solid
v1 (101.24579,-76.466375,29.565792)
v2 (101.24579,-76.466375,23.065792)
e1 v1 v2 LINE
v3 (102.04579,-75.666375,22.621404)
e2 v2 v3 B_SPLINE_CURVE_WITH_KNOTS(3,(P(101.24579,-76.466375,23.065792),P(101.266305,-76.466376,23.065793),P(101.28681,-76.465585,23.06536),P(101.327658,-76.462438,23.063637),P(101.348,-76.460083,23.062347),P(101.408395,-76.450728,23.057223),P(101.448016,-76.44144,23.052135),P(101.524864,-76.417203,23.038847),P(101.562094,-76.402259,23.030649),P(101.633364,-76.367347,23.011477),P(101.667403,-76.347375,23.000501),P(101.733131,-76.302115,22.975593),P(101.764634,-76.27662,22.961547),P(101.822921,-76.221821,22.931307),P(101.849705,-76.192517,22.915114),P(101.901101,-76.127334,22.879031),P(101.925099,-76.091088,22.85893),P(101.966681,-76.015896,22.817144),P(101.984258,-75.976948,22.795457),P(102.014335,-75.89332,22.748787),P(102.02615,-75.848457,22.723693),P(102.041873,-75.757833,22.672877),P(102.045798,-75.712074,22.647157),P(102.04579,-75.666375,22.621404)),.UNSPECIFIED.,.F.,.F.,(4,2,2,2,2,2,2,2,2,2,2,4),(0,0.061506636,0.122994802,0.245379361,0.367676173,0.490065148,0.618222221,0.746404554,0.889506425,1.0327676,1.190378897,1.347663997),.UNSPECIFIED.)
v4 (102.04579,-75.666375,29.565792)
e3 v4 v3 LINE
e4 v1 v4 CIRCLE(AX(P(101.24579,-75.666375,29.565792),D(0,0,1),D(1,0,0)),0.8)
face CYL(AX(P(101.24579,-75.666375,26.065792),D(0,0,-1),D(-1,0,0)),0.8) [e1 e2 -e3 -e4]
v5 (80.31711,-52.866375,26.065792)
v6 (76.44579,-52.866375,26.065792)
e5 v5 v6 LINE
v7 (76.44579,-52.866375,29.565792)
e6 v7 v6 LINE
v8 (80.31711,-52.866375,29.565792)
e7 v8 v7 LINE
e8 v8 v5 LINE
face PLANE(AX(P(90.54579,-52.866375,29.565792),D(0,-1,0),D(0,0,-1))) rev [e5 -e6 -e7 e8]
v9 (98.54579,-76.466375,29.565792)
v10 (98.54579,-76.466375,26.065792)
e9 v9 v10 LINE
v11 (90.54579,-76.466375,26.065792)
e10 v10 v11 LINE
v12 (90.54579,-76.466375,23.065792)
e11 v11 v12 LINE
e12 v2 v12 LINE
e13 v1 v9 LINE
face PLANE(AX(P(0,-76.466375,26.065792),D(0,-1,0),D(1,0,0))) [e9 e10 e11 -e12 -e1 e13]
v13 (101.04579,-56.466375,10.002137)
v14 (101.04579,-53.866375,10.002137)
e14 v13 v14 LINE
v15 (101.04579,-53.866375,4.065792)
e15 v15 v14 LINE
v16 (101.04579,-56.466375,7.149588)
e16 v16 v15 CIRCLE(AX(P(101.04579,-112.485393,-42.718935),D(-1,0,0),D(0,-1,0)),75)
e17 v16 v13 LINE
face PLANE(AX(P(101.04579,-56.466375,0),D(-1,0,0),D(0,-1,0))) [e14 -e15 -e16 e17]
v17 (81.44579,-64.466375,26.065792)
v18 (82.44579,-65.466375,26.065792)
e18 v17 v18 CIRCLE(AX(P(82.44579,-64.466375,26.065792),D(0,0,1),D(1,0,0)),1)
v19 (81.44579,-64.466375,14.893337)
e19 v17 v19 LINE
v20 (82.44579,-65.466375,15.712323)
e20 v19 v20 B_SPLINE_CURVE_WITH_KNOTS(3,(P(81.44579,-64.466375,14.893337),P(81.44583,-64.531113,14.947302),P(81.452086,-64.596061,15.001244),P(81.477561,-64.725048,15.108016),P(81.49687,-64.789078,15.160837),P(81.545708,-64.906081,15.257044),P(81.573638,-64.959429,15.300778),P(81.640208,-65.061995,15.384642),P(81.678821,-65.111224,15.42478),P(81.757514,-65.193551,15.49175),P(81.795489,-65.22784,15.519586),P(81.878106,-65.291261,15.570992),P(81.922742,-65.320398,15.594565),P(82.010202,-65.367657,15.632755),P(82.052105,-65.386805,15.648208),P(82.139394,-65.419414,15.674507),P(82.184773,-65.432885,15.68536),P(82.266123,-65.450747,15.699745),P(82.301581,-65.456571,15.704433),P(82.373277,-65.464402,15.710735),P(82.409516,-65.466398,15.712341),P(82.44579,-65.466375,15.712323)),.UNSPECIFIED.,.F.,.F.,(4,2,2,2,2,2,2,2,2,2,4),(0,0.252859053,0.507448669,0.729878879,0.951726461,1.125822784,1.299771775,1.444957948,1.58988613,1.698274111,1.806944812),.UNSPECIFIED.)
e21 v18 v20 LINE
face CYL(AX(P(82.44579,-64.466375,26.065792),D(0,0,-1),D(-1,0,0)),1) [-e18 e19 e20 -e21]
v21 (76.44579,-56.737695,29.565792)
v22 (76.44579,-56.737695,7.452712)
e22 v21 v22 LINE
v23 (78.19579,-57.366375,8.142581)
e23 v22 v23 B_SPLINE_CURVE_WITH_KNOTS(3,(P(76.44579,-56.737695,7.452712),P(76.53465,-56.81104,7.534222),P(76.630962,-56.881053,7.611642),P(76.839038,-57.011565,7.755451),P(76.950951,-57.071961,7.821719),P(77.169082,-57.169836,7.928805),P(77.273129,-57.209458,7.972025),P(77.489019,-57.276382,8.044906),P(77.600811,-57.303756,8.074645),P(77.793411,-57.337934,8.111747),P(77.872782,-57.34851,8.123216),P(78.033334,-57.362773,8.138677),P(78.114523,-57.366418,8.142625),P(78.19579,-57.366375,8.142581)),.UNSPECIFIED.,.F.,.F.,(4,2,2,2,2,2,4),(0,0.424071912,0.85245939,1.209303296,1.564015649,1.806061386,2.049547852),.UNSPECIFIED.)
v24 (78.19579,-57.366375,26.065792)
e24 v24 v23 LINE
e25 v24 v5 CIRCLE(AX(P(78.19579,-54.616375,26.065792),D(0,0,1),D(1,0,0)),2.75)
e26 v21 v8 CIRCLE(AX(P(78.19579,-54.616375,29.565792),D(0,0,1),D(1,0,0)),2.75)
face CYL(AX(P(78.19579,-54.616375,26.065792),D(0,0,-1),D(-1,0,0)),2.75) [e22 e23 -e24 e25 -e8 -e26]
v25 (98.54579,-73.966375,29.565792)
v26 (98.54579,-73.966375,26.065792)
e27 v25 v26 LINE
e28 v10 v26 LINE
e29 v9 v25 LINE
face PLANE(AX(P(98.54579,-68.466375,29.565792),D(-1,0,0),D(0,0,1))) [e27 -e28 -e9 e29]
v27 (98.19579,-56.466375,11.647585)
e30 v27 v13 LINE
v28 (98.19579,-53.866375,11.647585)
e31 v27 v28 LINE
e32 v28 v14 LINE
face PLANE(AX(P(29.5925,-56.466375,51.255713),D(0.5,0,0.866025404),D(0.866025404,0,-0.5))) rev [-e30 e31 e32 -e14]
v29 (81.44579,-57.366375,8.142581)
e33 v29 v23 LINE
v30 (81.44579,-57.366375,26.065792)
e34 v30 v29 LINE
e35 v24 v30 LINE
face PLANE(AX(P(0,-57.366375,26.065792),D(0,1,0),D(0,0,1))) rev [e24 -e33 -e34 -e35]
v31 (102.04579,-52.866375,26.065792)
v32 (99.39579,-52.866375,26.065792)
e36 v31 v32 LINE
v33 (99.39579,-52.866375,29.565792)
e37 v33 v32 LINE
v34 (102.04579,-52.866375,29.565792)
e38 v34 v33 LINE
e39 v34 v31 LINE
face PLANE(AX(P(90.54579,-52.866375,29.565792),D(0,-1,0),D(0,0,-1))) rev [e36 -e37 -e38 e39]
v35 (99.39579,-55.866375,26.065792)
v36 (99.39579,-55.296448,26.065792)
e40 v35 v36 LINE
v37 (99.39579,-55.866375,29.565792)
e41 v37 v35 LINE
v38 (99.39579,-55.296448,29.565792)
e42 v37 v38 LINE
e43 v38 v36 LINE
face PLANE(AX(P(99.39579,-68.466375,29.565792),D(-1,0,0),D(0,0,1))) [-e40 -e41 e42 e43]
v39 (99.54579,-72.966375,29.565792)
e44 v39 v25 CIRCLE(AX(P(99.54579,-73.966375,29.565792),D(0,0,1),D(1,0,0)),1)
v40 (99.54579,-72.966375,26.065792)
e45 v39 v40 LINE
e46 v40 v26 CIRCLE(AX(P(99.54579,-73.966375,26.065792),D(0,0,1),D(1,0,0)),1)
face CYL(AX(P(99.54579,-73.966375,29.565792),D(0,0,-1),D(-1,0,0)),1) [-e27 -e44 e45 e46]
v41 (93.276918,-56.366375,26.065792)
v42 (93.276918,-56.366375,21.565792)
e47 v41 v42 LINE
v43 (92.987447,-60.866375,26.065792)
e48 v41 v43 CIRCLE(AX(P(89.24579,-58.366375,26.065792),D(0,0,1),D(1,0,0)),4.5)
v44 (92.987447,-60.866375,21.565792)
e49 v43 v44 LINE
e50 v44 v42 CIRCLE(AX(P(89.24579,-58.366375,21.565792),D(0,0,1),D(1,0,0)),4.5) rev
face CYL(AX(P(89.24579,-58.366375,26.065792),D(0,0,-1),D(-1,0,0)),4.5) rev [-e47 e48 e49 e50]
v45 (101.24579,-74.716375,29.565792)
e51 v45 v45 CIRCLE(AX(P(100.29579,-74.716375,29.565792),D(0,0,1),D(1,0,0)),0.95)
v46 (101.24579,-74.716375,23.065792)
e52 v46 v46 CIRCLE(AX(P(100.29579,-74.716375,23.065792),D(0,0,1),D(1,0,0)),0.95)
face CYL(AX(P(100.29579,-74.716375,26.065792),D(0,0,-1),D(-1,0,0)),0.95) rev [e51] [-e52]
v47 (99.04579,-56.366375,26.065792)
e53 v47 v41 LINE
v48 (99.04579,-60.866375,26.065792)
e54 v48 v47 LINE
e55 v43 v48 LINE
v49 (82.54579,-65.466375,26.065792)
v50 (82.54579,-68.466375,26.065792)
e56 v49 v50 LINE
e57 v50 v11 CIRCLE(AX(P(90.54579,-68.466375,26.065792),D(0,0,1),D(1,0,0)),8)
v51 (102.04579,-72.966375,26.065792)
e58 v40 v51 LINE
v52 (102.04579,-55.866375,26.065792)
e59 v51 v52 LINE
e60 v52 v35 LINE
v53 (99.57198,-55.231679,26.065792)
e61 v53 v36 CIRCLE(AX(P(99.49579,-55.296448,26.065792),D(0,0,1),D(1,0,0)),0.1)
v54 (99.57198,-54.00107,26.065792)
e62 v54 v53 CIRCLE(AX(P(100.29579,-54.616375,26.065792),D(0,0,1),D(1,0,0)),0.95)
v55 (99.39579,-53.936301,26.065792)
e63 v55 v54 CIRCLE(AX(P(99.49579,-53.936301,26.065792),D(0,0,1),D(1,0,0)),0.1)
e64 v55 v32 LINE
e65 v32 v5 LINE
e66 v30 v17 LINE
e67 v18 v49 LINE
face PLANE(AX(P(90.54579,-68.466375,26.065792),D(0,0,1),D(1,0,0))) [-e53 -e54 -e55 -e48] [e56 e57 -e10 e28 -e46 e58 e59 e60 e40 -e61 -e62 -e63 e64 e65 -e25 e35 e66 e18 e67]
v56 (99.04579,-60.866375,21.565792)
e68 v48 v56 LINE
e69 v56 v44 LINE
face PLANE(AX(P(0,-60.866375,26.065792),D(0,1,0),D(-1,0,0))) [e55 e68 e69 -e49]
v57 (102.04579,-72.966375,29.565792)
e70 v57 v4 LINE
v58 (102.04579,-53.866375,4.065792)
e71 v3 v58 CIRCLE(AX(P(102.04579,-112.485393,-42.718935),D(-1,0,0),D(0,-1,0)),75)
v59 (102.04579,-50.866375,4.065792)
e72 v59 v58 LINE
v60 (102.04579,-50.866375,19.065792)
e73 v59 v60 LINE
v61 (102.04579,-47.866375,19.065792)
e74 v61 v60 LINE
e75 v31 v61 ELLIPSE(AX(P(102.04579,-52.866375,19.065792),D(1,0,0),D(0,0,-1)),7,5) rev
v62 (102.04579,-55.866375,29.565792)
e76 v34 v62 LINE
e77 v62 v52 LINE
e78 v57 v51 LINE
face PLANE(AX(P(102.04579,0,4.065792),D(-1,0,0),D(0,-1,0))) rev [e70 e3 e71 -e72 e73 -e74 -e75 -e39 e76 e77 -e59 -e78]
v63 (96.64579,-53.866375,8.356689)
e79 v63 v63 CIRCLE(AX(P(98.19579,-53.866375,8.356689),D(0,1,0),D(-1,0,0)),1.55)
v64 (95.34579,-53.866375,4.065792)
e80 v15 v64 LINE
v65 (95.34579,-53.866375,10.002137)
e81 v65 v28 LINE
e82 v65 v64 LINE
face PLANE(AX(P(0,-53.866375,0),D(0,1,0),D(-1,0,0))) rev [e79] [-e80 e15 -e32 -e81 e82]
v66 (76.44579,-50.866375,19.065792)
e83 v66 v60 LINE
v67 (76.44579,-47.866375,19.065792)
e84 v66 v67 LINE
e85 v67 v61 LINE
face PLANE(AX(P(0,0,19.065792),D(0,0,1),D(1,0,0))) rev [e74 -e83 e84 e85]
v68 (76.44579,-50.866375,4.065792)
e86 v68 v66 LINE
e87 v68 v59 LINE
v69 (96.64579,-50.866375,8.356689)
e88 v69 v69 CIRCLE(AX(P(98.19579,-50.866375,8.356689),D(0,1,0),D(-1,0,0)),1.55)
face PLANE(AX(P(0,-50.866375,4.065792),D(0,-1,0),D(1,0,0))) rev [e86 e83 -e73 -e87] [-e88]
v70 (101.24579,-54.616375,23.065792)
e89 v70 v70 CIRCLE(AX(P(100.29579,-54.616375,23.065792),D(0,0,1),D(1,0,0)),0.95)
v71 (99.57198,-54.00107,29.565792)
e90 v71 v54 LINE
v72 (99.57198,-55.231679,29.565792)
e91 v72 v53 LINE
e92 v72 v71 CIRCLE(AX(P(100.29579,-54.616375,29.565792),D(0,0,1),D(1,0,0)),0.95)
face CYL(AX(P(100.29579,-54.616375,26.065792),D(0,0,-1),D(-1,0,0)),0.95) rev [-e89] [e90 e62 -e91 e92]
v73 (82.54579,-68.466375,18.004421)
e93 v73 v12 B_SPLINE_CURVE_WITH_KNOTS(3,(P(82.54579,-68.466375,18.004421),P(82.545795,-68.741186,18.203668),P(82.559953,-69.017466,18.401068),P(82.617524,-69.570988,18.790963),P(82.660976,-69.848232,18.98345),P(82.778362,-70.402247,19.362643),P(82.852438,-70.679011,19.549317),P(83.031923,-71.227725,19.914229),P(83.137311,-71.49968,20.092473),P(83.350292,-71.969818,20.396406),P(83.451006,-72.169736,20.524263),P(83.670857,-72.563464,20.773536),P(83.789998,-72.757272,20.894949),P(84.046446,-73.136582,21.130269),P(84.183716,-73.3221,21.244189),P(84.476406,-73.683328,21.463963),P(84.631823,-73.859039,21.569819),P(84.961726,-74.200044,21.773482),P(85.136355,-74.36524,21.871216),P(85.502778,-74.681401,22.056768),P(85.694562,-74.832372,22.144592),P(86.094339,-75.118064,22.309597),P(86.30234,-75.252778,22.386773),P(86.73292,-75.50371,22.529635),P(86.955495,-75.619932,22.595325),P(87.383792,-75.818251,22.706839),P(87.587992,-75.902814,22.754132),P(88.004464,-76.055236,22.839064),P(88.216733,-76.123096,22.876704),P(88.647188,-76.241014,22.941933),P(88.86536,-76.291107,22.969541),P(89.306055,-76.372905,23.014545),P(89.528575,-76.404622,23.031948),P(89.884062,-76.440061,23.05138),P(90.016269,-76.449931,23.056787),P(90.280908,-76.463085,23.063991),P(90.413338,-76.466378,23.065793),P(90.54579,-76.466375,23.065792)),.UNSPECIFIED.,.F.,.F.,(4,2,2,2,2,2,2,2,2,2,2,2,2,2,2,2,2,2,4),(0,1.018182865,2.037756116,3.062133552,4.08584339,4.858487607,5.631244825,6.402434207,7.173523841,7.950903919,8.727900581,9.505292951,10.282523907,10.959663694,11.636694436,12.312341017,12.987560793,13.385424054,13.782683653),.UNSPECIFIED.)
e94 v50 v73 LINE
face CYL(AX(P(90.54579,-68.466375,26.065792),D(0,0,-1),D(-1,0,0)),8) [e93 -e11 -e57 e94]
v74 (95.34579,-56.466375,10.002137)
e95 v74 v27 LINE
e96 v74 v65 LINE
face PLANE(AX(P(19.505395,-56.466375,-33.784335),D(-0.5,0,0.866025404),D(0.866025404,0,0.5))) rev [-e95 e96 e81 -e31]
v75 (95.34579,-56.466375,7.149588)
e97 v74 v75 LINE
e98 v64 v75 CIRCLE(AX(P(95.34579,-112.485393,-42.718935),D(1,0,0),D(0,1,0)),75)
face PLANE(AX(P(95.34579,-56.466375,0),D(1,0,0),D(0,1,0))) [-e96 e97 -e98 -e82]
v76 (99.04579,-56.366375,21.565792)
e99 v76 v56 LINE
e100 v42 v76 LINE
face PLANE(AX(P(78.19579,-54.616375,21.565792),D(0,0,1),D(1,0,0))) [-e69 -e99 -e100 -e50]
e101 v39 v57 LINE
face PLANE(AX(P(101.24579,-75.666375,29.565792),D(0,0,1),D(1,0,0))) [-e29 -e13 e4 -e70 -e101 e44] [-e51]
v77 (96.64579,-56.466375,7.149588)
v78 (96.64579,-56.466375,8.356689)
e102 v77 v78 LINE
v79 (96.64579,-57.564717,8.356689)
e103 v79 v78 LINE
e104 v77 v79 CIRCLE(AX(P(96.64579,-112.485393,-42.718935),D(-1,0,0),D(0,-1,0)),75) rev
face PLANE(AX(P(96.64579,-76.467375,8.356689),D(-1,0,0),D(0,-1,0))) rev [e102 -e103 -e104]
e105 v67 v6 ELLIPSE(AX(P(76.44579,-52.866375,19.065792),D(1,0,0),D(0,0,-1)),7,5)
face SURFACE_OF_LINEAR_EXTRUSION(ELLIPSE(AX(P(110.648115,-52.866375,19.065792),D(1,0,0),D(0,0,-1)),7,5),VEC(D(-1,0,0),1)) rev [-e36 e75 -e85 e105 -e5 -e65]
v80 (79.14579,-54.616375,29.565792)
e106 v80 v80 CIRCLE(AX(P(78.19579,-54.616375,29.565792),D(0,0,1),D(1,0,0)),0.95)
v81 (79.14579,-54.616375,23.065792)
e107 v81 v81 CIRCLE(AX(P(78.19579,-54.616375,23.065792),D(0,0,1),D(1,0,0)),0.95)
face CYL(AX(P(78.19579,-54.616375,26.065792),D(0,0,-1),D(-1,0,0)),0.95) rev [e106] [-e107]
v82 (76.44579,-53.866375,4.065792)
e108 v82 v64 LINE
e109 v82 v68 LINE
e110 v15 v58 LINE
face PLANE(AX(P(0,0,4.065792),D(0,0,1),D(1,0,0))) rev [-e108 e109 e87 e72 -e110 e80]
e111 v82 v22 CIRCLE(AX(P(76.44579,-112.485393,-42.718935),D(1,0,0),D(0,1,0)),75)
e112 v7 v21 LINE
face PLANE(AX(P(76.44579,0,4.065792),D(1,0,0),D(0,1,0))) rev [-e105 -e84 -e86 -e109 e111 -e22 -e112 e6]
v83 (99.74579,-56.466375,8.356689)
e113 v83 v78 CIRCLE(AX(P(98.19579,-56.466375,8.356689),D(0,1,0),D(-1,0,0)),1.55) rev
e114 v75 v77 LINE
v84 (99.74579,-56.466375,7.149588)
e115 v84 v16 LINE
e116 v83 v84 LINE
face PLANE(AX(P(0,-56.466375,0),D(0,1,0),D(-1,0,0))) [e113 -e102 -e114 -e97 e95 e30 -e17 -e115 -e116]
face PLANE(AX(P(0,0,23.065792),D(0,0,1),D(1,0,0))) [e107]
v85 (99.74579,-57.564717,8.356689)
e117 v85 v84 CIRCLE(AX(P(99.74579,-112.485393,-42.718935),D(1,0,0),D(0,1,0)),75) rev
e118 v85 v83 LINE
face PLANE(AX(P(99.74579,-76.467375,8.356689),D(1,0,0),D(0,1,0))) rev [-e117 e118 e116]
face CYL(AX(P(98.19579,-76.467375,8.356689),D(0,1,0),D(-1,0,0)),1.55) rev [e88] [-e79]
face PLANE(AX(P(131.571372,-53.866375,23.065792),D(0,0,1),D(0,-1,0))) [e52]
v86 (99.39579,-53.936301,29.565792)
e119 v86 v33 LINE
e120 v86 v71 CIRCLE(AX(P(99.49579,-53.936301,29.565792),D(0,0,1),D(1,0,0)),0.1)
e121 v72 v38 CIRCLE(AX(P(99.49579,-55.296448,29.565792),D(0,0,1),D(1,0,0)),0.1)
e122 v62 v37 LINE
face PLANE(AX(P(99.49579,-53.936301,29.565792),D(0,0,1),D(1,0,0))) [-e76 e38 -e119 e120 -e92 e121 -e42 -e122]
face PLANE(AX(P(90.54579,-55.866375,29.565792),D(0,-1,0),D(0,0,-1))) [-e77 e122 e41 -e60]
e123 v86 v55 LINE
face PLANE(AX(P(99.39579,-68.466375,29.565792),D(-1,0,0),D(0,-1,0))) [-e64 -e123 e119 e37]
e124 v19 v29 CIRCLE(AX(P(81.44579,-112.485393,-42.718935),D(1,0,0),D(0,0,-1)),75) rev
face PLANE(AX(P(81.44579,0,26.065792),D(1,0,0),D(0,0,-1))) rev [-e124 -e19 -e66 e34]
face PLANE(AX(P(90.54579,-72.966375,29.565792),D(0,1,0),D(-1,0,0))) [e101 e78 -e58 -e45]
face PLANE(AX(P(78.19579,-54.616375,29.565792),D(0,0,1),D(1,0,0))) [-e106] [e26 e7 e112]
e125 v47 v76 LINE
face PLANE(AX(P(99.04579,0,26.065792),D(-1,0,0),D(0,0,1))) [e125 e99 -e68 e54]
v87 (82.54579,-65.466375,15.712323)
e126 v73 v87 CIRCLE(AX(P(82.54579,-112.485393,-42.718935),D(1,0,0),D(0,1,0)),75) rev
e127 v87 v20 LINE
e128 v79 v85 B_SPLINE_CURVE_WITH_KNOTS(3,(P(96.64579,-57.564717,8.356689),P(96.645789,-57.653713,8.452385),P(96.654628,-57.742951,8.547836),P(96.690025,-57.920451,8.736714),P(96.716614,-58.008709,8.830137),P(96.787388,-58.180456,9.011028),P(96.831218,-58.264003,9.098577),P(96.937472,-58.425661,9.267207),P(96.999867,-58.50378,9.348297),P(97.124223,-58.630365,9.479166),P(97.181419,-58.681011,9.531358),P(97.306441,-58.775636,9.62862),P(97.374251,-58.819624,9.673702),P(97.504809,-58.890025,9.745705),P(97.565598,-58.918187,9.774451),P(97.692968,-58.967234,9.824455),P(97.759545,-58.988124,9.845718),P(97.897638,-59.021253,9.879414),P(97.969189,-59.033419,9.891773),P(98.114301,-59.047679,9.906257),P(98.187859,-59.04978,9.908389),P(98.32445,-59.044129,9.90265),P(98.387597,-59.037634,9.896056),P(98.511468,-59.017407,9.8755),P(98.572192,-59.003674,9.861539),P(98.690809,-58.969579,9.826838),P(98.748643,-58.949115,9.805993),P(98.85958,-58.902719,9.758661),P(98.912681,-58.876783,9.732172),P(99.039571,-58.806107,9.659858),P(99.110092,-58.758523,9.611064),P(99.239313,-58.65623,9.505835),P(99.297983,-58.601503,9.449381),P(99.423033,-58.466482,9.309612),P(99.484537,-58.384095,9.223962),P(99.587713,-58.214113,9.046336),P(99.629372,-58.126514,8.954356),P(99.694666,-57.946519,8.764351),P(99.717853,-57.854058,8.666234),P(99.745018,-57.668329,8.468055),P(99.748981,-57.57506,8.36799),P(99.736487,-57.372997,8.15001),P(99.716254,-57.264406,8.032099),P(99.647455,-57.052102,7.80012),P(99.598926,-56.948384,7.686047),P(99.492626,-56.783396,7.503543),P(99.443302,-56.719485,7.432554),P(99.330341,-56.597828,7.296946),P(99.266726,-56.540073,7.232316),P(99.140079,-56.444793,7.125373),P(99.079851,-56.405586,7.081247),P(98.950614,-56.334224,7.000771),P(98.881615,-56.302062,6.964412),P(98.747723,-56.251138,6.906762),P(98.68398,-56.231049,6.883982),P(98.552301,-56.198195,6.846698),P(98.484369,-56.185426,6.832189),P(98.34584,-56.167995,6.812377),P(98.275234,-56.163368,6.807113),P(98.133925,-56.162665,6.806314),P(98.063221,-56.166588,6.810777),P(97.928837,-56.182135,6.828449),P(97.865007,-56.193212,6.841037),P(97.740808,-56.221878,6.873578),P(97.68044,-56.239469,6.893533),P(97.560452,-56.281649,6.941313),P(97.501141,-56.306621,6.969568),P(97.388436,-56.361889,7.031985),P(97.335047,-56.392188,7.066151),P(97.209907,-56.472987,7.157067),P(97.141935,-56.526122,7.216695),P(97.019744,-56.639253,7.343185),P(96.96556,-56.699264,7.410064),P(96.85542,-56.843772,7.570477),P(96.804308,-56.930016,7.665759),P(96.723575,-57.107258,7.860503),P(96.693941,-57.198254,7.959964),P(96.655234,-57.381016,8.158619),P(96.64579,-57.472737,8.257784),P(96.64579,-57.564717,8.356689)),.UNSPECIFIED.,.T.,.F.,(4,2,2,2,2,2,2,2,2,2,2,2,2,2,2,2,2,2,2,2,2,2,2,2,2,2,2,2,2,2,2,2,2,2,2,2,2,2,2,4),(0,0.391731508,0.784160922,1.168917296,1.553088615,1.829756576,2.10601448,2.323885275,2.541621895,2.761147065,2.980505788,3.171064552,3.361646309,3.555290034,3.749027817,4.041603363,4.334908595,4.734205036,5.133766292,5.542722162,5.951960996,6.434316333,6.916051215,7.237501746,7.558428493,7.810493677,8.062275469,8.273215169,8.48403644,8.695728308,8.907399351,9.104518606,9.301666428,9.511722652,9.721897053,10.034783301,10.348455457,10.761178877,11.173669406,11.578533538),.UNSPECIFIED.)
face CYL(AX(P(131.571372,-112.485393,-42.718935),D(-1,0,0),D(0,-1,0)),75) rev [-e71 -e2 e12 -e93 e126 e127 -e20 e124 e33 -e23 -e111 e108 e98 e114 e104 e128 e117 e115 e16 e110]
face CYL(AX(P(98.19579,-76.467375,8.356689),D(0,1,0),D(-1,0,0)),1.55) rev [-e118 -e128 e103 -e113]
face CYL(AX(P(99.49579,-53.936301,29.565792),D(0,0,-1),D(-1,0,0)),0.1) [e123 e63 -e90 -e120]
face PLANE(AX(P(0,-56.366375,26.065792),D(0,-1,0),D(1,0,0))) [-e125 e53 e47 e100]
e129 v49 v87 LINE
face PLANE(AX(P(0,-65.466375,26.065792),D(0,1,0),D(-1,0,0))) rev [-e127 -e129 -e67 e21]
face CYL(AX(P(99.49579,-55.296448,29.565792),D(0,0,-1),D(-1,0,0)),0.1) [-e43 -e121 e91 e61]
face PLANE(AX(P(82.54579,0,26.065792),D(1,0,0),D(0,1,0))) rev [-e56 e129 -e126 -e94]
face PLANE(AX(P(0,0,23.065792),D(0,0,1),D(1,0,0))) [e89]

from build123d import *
from build123d.topology import SkipClean

# Parameters (mm, degrees)
BOSS_EXTRUDE1_START     = -15
BOSS_EXTRUDE1_OUTLINE_W = 25.6
BOSS_EXTRUDE1_OUTLINE_H = 3
BOSS_EXTRUDE1_DEPTH     = 15
SKETCH2_4_W             = 25.6
SKETCH2_4_H             = 6
BOSS_EXTRUDE2_DEPTH     = 4
BOSS_EXTRUDE6_START     = 4
SKETCH2_6_R             = 0.95
BOSS_EXTRUDE6_DEPTH     = 3
BOSS_EXTRUDE7_START     = 7
SKETCH2_7_R             = 0.95
BOSS_EXTRUDE7_DEPTH     = 3.5
BOSS_EXTRUDE8_START     = -25.6
BOSS_EXTRUDE8_DEPTH     = 25.6
CUT_EXTRUDE1_REACH      = 130.924
CUT_EXTRUDE1_END_RADIUS = 75
CUT_EXTRUDE2_START      = -1.5
CUT_EXTRUDE2_DEPTH      = 1.5
CUT_EXTRUDE3_REACH      = 87.887
CUT_EXTRUDE4_REACH      = 111.283
CUT_EXTRUDE4_END_RADIUS = 75
SKETCH6_R               = 1.55
CUT_EXTRUDE5_START      = -3
SKETCH6_4_R             = 1.55
CUT_EXTRUDE5_DEPTH      = 2.6
CUT_EXTRUDE6_START      = -1.098342
SKETCH7_W               = 3.1
SKETCH7_H               = 1.207100643
CUT_EXTRUDE6_DEPTH      = 1.098342


# Read off the part's stored shape, not the designer's step: Boss-Extrude1
with BuildPart() as part:
    # Boss-Extrude1 outline → Boss-Extrude1 (new body)
    with BuildSketch(Plane.XY.offset(19.065792005).offset(BOSS_EXTRUDE1_START)):
        with Locations((89.245789569, -52.366374711)):
            Rectangle(BOSS_EXTRUDE1_OUTLINE_W, BOSS_EXTRUDE1_OUTLINE_H)
    extrude(amount=BOSS_EXTRUDE1_DEPTH)

    # Sketch2<4> → Boss-Extrude2 (add)
    with BuildSketch(Plane.XY.offset(19.065792005)):
        with Locations((89.245789569, -50.866374711)):
            Rectangle(SKETCH2_4_W, SKETCH2_4_H)
    extrude(amount=BOSS_EXTRUDE2_DEPTH)

    # Sketch2<6> → Boss-Extrude6 (add)
    with BuildSketch(Plane.XY.offset(19.065792005).offset(BOSS_EXTRUDE6_START)):
        with BuildLine():
            ThreePointArc((76.445789569, -56.737695055), (77.266039857, -57.204436819), (78.195789569, -57.366374711))
            Line((78.195789569, -57.366374711), (81.445789569, -57.366374711))
            Line((81.445789569, -57.366374711), (81.445789569, -64.466374711))
            ThreePointArc((81.445789569, -64.466374711), (81.738682788, -65.173481493), (82.445789569, -65.466374711))
            Line((82.445789569, -65.466374711), (82.545789569, -65.466374711))
            Line((82.545789569, -65.466374711), (82.545789569, -68.466374711))
            ThreePointArc((82.545789569, -68.466374711), (84.88893532, -74.123228961), (90.545789569, -76.466374711))
            Line((90.545789569, -76.466374711), (101.245789569, -76.466374711))
            ThreePointArc((101.245789569, -76.466374711), (101.811474994, -76.232060136), (102.045789569, -75.666374711))
            Line((102.045789569, -75.666374711), (102.045789569, -47.866374711))
            Line((102.045789569, -47.866374711), (76.445789569, -47.866374711))
            Line((76.445789569, -47.866374711), (76.445789569, -56.737695055))
        make_face()
        with Locations(Location((100.295789569, -54.616374711, 0), (0, 0, 127.863646362))):
            Circle(SKETCH2_6_R, mode=Mode.SUBTRACT)
        with Locations(Location((78.195789569, -54.616374711, 0), (0, 0, 127.863646362))):
            Circle(SKETCH2_6_R, mode=Mode.SUBTRACT)
        with BuildLine():
            Line((99.045789569, -56.366374711), (99.045789569, -60.866374711))
            Line((99.045789569, -60.866374711), (92.987446956, -60.866374711))
            ThreePointArc((92.987446956, -60.866374711), (84.75507119, -58.077500283), (93.276918444, -56.366374711))
            Line((93.276918444, -56.366374711), (99.045789569, -56.366374711))
        make_face(mode=Mode.SUBTRACT)
        with Locations((100.295789569, -74.716374711)):
            Circle(SKETCH2_6_R, mode=Mode.SUBTRACT)
    extrude(amount=BOSS_EXTRUDE6_DEPTH)

    # Sketch2<7> → Boss-Extrude7 (add)
    # profile 1 of 6: a face of its own
    with SkipClean():  # the faces are left unmerged after this step: merging them gives an invalid solid
        with BuildSketch(Plane.XY.offset(19.065792005).offset(BOSS_EXTRUDE7_START)):
            with BuildLine():
                ThreePointArc((78.195789569, -57.366374711), (80.389530666, -56.274687107), (80.84154088, -53.866374711))
                Line((80.84154088, -53.866374711), (78.778884759, -53.866374711))
                ThreePointArc((78.778884759, -53.866374711), (79.049147768, -54.198906407), (79.145789569, -54.616374711))
                ThreePointArc((79.145789569, -54.616374711), (77.778321265, -55.46973291), (77.61269438, -53.866374711))
                Line((77.61269438, -53.866374711), (76.445789569, -53.866374711))
                Line((76.445789569, -53.866374711), (76.445789569, -56.737695055))
                ThreePointArc((76.445789569, -56.737695055), (77.266039857, -57.204436819), (78.195789569, -57.366374711))
            make_face()
        # profile 2 of 6: a face of its own
        with BuildSketch(Plane.XY.offset(19.065792005).offset(BOSS_EXTRUDE7_START)):
            with BuildLine():
                Line((78.778884759, -53.866374711), (80.84154088, -53.866374711))
                ThreePointArc((80.84154088, -53.866374711), (80.631203916, -53.339168009), (80.317109913, -52.866374711))
                Line((80.317109913, -52.866374711), (76.445789569, -52.866374711))
                Line((76.445789569, -52.866374711), (76.445789569, -53.866374711))
                Line((76.445789569, -53.866374711), (77.61269438, -53.866374711))
                ThreePointArc((77.61269438, -53.866374711), (78.195789569, -53.666374711), (78.778884759, -53.866374711))
            make_face()
        # profile 3 of 6: a face of its own
        with BuildSketch(Plane.XY.offset(19.065792005).offset(BOSS_EXTRUDE7_START)):
            with BuildLine():
                Line((102.045789569, -53.866374711), (100.878884759, -53.866374711))
                ThreePointArc((100.878884759, -53.866374711), (101.149147768, -54.198906407), (101.245789569, -54.616374711))
                ThreePointArc((101.245789569, -54.616374711), (100.62357071, -55.508035815), (99.571980046, -55.23167933))
                ThreePointArc((99.571980046, -55.23167933), (99.461286291, -55.202589173), (99.395789569, -55.296448237))
                Line((99.395789569, -55.296448237), (99.395789569, -55.866374711))
                Line((99.395789569, -55.866374711), (102.045789569, -55.866374711))
                Line((102.045789569, -55.866374711), (102.045789569, -53.866374711))
            make_face()
        # profile 4 of 6: a face of its own
        with BuildSketch(Plane.XY.offset(19.065792005).offset(BOSS_EXTRUDE7_START)):
            with BuildLine():
                Line((99.395789569, -52.866374711), (99.395789569, -53.866374711))
                Line((99.395789569, -53.866374711), (99.71269438, -53.866374711))
                ThreePointArc((99.71269438, -53.866374711), (100.295789569, -53.666374711), (100.878884759, -53.866374711))
                Line((100.878884759, -53.866374711), (102.045789569, -53.866374711))
                Line((102.045789569, -53.866374711), (102.045789569, -52.866374711))
                Line((102.045789569, -52.866374711), (99.395789569, -52.866374711))
            make_face()
        # profile 5 of 6: a face of its own
        with BuildSketch(Plane.XY.offset(19.065792005).offset(BOSS_EXTRUDE7_START)):
            with BuildLine():
                Line((99.71269438, -53.866374711), (99.395789569, -53.866374711))
                Line((99.395789569, -53.866374711), (99.395789569, -53.936301186))
                ThreePointArc((99.395789569, -53.936301186), (99.461286291, -54.03016025), (99.571980046, -54.001070093))
                ThreePointArc((99.571980046, -54.001070093), (99.638875805, -53.930106319), (99.71269438, -53.866374711))
            make_face()
        # profile 6 of 6: a face of its own
        with BuildSketch(Plane.XY.offset(19.065792005).offset(BOSS_EXTRUDE7_START)):
            with BuildLine():
                Line((102.045789569, -75.666374711), (102.045789569, -72.966374711))
                Line((102.045789569, -72.966374711), (99.545789569, -72.966374711))
                ThreePointArc((99.545789569, -72.966374711), (98.838682788, -73.25926793), (98.545789569, -73.966374711))
                Line((98.545789569, -73.966374711), (98.545789569, -76.466374711))
                Line((98.545789569, -76.466374711), (101.245789569, -76.466374711))
                ThreePointArc((101.245789569, -76.466374711), (101.811474994, -76.232060136), (102.045789569, -75.666374711))
            make_face()
            with Locations((100.295789569, -74.716374711)):
                Circle(SKETCH2_7_R, mode=Mode.SUBTRACT)
        extrude(amount=BOSS_EXTRUDE7_DEPTH)

    # Sketch3 → Boss-Extrude8 (add)
    with SkipClean():  # the faces are left unmerged after this step: merging them gives an invalid solid
        with BuildSketch(Plane.ZY.offset(-76.445789569).offset(BOSS_EXTRUDE8_START)):
            with BuildLine():
                Line((4.065792005, -53.866374711), (23.065792005, -53.866374711))
                Line((23.065792005, -53.866374711), (23.065792005, -76.466374711))
                ThreePointArc((23.065792005, -76.466374711), (14.688908487, -64.22216174), (4.065792005, -53.866374711))
            make_face()
        extrude(amount=BOSS_EXTRUDE8_DEPTH)

    # Cut-Extrude1: up to this cylinder (the profile starts outside it)
    with SkipClean():  # the faces are left unmerged after this step: merging them gives an invalid solid
        cut_extrude1_end = Plane(origin=(90.860738, -112.485393056, -42.718935079), z_dir=(-1, 0, 0)) * Cylinder(CUT_EXTRUDE1_END_RADIUS, 434.860714, mode=Mode.PRIVATE)
        # Sketch4 → Cut-Extrude1 (cut, up to the surface)
        with BuildSketch(Plane.XY.offset(23.065792005), mode=Mode.PRIVATE) as cut_extrude1_sk1:
            with BuildLine():
                ThreePointArc((76.445789569, -56.737695055), (77.266039857, -57.204436819), (78.195789569, -57.366374711))
                Line((78.195789569, -57.366374711), (81.445789569, -57.366374711))
                Line((81.445789569, -57.366374711), (81.445789569, -64.466374711))
                ThreePointArc((81.445789569, -64.466374711), (81.738682788, -65.173481493), (82.445789569, -65.466374711))
                Line((82.445789569, -65.466374711), (82.545789569, -65.466374711))
                Line((82.545789569, -65.466374711), (82.545789569, -68.466374711))
                ThreePointArc((82.545789569, -68.466374711), (84.88893532, -74.123228961), (90.545789569, -76.466374711))
                Line((90.545789569, -76.466374711), (76.445789569, -76.466374711))
                Line((76.445789569, -76.466374711), (76.445789569, -56.737695055))
            make_face()
        cut_extrude1_tool1 = extrude(cut_extrude1_sk1.sketch, amount=-CUT_EXTRUDE1_REACH, mode=Mode.PRIVATE) - cut_extrude1_end
        add(cut_extrude1_tool1.solids().sort_by_distance((79.854381, -68.162333, 23.065792))[0], mode=Mode.SUBTRACT)
        # Sketch4 → Cut-Extrude1 (cut, up to the surface)
        with BuildSketch(Plane.XY.offset(23.065792005), mode=Mode.PRIVATE) as cut_extrude1_sk2:
            with BuildLine():
                ThreePointArc((101.245789569, -76.466374711), (101.811474994, -76.232060136), (102.045789569, -75.666374711))
                Line((102.045789569, -75.666374711), (102.045789569, -76.466374711))
                Line((102.045789569, -76.466374711), (101.245789569, -76.466374711))
            make_face()
        cut_extrude1_tool2 = extrude(cut_extrude1_sk2.sketch, amount=-CUT_EXTRUDE1_REACH, mode=Mode.PRIVATE) - cut_extrude1_end
        add(cut_extrude1_tool2.solids().sort_by_distance((101.867095, -76.28768, 23.065792))[0], mode=Mode.SUBTRACT)

    # Sketch4<3> → Cut-Extrude2 (cut)
    with SkipClean():  # the faces are left unmerged after this step: merging them gives an invalid solid
        with BuildSketch(Plane.XY.offset(23.065792005).offset(CUT_EXTRUDE2_START)):
            with BuildLine():
                Line((99.045789569, -60.866374711), (99.045789569, -56.366374711))
                Line((99.045789569, -56.366374711), (93.276918444, -56.366374711))
                ThreePointArc((93.276918444, -56.366374711), (84.75507119, -58.077500283), (92.987446956, -60.866374711))
                Line((92.987446956, -60.866374711), (99.045789569, -60.866374711))
            make_face()
        extrude(amount=CUT_EXTRUDE2_DEPTH, mode=Mode.SUBTRACT)

    # Cut-Extrude3: up to this face of the body (flat: up to its plane)
    cut_extrude3_end = Plane(part.part.faces().sort_by_distance((102.045789569, -60.857452704, 17.150237261))[0])
    # Sketch5 → Cut-Extrude3 (cut, up to the picked face)
    with BuildSketch(Plane.ZY.offset(-76.445789569), mode=Mode.PRIVATE) as cut_extrude3_sk1:
        with BuildLine():
            Line((19.065792005, -47.866374711), (26.065792005, -47.866374711))
            Line((26.065792005, -47.866374711), (26.065792005, -52.866374711))
            add(Edge.make_bspline(
                [(26.065792005, -52.866374711), (26.065792005, -47.866374711), (19.065792005, -47.866374711)],
                knots=[3.141592654, 3.141592654, 3.141592654, 4.71238898, 4.71238898, 4.71238898], degree=2, weights=[1, 0.707106781, 1]))
        make_face()
    cut_extrude3_tool1 = split(extrude(cut_extrude3_sk1.sketch, amount=-CUT_EXTRUDE3_REACH, mode=Mode.PRIVATE), bisect_by=cut_extrude3_end, keep=Keep.BOTH, mode=Mode.PRIVATE)
    add(cut_extrude3_tool1.solids().sort_by(Axis((76.44579, -48.983214, 24.502216), (1, 0, 0)))[0], mode=Mode.SUBTRACT)

    # Cut-Extrude4: up to this cylinder (the profile starts outside it)
    with SkipClean():  # the faces are left unmerged after this step: merging them gives an invalid solid
        cut_extrude4_end = Plane(origin=(113.9359425, -112.485393056, -42.718935079), z_dir=(-1, 0, 0)) * Cylinder(CUT_EXTRUDE4_END_RADIUS, 405.046305, mode=Mode.PRIVATE)
        # Sketch6 → Cut-Extrude4 (cut, up to the surface)
        with BuildSketch(Plane(origin=(0, -50.866374711, 0), x_dir=(1, 0, 0), z_dir=(0, 1, 0)), mode=Mode.PRIVATE) as cut_extrude4_sk1:
            with Locations((129.676095042, -14.774895471)):
                Circle(SKETCH6_R)
        cut_extrude4_tool1 = extrude(cut_extrude4_sk1.sketch, amount=-CUT_EXTRUDE4_REACH, mode=Mode.PRIVATE) - cut_extrude4_end
        add(cut_extrude4_tool1.solids().sort_by_distance((129.676095, -50.866375, 14.774895))[0], mode=Mode.SUBTRACT)
        # Sketch6 → Cut-Extrude4 (cut, up to the surface)
        with BuildSketch(Plane(origin=(0, -50.866374711, 0), x_dir=(1, 0, 0), z_dir=(0, 1, 0)), mode=Mode.PRIVATE) as cut_extrude4_sk2:
            with Locations(Location((98.195789569, -8.356688539, 0), (0, 0, 180))):
                Circle(SKETCH6_R)
        cut_extrude4_tool2 = extrude(cut_extrude4_sk2.sketch, amount=-CUT_EXTRUDE4_REACH, mode=Mode.PRIVATE) - cut_extrude4_end
        add(cut_extrude4_tool2.solids().sort_by_distance((98.19579, -50.866375, 8.356689))[0], mode=Mode.SUBTRACT)

    # Sketch6<4> → Cut-Extrude5 (cut)
    # profile 1 of 4: a face of its own
    with SkipClean():  # the faces are left unmerged after this step: merging them gives an invalid solid
        with BuildSketch(Plane(origin=(0, -50.866374711, 0), x_dir=(1, 0, 0), z_dir=(0, 1, 0)).offset(CUT_EXTRUDE5_START)):
            Polygon((132.526095042, -13.129447203), (129.676095042, -11.483998936), (126.826095042, -13.129447203), (126.826095042, -16.420343738), (129.676095042, -18.065792005), (132.526095042, -16.420343738), align=None)
            with Locations((129.676095042, -14.774895471)):
                Circle(SKETCH6_4_R, mode=Mode.SUBTRACT)
        # profile 2 of 4: a face of its own
        with BuildSketch(Plane(origin=(0, -50.866374711, 0), x_dir=(1, 0, 0), z_dir=(0, 1, 0)).offset(CUT_EXTRUDE5_START)):
            Polygon((126.826095042, -13.129447203), (129.676095042, -11.483998936), (132.526095042, -13.129447203), (132.526095042, -4.065792005), (126.826095042, -4.065792005), align=None)
        # profile 3 of 4: a face of its own
        with BuildSketch(Plane(origin=(0, -50.866374711, 0), x_dir=(1, 0, 0), z_dir=(0, 1, 0)).offset(CUT_EXTRUDE5_START)):
            Polygon((101.045789569, -6.711240272), (98.195789569, -5.065792005), (95.345789569, -6.711240272), (95.345789569, -10.002136807), (98.195789569, -11.647585074), (101.045789569, -10.002136807), align=None)
            with Locations(Location((98.195789569, -8.356688539, 0), (0, 0, 180))):
                Circle(SKETCH6_4_R, mode=Mode.SUBTRACT)
        # profile 4 of 4: a face of its own
        with BuildSketch(Plane(origin=(0, -50.866374711, 0), x_dir=(1, 0, 0), z_dir=(0, 1, 0)).offset(CUT_EXTRUDE5_START)):
            Polygon((95.345789569, -6.711240272), (98.195789569, -5.065792005), (101.045789569, -6.711240272), (101.045789569, -4.065792005), (95.345789569, -4.065792005), align=None)
        extrude(amount=-CUT_EXTRUDE5_DEPTH, mode=Mode.SUBTRACT)

    # Sketch7 → Cut-Extrude6 (cut)
    with SkipClean():  # the faces are left unmerged after this step: merging them gives an invalid solid
        with BuildSketch(Plane(origin=(0, -56.466374711, 0), x_dir=(1, 0, 0), z_dir=(0, 1, 0)).offset(CUT_EXTRUDE6_START)):
            with Locations((98.195789569, -7.753138218)):
                Rectangle(SKETCH7_W, SKETCH7_H)
        extrude(amount=CUT_EXTRUDE6_DEPTH, mode=Mode.SUBTRACT)


solid = part.part
